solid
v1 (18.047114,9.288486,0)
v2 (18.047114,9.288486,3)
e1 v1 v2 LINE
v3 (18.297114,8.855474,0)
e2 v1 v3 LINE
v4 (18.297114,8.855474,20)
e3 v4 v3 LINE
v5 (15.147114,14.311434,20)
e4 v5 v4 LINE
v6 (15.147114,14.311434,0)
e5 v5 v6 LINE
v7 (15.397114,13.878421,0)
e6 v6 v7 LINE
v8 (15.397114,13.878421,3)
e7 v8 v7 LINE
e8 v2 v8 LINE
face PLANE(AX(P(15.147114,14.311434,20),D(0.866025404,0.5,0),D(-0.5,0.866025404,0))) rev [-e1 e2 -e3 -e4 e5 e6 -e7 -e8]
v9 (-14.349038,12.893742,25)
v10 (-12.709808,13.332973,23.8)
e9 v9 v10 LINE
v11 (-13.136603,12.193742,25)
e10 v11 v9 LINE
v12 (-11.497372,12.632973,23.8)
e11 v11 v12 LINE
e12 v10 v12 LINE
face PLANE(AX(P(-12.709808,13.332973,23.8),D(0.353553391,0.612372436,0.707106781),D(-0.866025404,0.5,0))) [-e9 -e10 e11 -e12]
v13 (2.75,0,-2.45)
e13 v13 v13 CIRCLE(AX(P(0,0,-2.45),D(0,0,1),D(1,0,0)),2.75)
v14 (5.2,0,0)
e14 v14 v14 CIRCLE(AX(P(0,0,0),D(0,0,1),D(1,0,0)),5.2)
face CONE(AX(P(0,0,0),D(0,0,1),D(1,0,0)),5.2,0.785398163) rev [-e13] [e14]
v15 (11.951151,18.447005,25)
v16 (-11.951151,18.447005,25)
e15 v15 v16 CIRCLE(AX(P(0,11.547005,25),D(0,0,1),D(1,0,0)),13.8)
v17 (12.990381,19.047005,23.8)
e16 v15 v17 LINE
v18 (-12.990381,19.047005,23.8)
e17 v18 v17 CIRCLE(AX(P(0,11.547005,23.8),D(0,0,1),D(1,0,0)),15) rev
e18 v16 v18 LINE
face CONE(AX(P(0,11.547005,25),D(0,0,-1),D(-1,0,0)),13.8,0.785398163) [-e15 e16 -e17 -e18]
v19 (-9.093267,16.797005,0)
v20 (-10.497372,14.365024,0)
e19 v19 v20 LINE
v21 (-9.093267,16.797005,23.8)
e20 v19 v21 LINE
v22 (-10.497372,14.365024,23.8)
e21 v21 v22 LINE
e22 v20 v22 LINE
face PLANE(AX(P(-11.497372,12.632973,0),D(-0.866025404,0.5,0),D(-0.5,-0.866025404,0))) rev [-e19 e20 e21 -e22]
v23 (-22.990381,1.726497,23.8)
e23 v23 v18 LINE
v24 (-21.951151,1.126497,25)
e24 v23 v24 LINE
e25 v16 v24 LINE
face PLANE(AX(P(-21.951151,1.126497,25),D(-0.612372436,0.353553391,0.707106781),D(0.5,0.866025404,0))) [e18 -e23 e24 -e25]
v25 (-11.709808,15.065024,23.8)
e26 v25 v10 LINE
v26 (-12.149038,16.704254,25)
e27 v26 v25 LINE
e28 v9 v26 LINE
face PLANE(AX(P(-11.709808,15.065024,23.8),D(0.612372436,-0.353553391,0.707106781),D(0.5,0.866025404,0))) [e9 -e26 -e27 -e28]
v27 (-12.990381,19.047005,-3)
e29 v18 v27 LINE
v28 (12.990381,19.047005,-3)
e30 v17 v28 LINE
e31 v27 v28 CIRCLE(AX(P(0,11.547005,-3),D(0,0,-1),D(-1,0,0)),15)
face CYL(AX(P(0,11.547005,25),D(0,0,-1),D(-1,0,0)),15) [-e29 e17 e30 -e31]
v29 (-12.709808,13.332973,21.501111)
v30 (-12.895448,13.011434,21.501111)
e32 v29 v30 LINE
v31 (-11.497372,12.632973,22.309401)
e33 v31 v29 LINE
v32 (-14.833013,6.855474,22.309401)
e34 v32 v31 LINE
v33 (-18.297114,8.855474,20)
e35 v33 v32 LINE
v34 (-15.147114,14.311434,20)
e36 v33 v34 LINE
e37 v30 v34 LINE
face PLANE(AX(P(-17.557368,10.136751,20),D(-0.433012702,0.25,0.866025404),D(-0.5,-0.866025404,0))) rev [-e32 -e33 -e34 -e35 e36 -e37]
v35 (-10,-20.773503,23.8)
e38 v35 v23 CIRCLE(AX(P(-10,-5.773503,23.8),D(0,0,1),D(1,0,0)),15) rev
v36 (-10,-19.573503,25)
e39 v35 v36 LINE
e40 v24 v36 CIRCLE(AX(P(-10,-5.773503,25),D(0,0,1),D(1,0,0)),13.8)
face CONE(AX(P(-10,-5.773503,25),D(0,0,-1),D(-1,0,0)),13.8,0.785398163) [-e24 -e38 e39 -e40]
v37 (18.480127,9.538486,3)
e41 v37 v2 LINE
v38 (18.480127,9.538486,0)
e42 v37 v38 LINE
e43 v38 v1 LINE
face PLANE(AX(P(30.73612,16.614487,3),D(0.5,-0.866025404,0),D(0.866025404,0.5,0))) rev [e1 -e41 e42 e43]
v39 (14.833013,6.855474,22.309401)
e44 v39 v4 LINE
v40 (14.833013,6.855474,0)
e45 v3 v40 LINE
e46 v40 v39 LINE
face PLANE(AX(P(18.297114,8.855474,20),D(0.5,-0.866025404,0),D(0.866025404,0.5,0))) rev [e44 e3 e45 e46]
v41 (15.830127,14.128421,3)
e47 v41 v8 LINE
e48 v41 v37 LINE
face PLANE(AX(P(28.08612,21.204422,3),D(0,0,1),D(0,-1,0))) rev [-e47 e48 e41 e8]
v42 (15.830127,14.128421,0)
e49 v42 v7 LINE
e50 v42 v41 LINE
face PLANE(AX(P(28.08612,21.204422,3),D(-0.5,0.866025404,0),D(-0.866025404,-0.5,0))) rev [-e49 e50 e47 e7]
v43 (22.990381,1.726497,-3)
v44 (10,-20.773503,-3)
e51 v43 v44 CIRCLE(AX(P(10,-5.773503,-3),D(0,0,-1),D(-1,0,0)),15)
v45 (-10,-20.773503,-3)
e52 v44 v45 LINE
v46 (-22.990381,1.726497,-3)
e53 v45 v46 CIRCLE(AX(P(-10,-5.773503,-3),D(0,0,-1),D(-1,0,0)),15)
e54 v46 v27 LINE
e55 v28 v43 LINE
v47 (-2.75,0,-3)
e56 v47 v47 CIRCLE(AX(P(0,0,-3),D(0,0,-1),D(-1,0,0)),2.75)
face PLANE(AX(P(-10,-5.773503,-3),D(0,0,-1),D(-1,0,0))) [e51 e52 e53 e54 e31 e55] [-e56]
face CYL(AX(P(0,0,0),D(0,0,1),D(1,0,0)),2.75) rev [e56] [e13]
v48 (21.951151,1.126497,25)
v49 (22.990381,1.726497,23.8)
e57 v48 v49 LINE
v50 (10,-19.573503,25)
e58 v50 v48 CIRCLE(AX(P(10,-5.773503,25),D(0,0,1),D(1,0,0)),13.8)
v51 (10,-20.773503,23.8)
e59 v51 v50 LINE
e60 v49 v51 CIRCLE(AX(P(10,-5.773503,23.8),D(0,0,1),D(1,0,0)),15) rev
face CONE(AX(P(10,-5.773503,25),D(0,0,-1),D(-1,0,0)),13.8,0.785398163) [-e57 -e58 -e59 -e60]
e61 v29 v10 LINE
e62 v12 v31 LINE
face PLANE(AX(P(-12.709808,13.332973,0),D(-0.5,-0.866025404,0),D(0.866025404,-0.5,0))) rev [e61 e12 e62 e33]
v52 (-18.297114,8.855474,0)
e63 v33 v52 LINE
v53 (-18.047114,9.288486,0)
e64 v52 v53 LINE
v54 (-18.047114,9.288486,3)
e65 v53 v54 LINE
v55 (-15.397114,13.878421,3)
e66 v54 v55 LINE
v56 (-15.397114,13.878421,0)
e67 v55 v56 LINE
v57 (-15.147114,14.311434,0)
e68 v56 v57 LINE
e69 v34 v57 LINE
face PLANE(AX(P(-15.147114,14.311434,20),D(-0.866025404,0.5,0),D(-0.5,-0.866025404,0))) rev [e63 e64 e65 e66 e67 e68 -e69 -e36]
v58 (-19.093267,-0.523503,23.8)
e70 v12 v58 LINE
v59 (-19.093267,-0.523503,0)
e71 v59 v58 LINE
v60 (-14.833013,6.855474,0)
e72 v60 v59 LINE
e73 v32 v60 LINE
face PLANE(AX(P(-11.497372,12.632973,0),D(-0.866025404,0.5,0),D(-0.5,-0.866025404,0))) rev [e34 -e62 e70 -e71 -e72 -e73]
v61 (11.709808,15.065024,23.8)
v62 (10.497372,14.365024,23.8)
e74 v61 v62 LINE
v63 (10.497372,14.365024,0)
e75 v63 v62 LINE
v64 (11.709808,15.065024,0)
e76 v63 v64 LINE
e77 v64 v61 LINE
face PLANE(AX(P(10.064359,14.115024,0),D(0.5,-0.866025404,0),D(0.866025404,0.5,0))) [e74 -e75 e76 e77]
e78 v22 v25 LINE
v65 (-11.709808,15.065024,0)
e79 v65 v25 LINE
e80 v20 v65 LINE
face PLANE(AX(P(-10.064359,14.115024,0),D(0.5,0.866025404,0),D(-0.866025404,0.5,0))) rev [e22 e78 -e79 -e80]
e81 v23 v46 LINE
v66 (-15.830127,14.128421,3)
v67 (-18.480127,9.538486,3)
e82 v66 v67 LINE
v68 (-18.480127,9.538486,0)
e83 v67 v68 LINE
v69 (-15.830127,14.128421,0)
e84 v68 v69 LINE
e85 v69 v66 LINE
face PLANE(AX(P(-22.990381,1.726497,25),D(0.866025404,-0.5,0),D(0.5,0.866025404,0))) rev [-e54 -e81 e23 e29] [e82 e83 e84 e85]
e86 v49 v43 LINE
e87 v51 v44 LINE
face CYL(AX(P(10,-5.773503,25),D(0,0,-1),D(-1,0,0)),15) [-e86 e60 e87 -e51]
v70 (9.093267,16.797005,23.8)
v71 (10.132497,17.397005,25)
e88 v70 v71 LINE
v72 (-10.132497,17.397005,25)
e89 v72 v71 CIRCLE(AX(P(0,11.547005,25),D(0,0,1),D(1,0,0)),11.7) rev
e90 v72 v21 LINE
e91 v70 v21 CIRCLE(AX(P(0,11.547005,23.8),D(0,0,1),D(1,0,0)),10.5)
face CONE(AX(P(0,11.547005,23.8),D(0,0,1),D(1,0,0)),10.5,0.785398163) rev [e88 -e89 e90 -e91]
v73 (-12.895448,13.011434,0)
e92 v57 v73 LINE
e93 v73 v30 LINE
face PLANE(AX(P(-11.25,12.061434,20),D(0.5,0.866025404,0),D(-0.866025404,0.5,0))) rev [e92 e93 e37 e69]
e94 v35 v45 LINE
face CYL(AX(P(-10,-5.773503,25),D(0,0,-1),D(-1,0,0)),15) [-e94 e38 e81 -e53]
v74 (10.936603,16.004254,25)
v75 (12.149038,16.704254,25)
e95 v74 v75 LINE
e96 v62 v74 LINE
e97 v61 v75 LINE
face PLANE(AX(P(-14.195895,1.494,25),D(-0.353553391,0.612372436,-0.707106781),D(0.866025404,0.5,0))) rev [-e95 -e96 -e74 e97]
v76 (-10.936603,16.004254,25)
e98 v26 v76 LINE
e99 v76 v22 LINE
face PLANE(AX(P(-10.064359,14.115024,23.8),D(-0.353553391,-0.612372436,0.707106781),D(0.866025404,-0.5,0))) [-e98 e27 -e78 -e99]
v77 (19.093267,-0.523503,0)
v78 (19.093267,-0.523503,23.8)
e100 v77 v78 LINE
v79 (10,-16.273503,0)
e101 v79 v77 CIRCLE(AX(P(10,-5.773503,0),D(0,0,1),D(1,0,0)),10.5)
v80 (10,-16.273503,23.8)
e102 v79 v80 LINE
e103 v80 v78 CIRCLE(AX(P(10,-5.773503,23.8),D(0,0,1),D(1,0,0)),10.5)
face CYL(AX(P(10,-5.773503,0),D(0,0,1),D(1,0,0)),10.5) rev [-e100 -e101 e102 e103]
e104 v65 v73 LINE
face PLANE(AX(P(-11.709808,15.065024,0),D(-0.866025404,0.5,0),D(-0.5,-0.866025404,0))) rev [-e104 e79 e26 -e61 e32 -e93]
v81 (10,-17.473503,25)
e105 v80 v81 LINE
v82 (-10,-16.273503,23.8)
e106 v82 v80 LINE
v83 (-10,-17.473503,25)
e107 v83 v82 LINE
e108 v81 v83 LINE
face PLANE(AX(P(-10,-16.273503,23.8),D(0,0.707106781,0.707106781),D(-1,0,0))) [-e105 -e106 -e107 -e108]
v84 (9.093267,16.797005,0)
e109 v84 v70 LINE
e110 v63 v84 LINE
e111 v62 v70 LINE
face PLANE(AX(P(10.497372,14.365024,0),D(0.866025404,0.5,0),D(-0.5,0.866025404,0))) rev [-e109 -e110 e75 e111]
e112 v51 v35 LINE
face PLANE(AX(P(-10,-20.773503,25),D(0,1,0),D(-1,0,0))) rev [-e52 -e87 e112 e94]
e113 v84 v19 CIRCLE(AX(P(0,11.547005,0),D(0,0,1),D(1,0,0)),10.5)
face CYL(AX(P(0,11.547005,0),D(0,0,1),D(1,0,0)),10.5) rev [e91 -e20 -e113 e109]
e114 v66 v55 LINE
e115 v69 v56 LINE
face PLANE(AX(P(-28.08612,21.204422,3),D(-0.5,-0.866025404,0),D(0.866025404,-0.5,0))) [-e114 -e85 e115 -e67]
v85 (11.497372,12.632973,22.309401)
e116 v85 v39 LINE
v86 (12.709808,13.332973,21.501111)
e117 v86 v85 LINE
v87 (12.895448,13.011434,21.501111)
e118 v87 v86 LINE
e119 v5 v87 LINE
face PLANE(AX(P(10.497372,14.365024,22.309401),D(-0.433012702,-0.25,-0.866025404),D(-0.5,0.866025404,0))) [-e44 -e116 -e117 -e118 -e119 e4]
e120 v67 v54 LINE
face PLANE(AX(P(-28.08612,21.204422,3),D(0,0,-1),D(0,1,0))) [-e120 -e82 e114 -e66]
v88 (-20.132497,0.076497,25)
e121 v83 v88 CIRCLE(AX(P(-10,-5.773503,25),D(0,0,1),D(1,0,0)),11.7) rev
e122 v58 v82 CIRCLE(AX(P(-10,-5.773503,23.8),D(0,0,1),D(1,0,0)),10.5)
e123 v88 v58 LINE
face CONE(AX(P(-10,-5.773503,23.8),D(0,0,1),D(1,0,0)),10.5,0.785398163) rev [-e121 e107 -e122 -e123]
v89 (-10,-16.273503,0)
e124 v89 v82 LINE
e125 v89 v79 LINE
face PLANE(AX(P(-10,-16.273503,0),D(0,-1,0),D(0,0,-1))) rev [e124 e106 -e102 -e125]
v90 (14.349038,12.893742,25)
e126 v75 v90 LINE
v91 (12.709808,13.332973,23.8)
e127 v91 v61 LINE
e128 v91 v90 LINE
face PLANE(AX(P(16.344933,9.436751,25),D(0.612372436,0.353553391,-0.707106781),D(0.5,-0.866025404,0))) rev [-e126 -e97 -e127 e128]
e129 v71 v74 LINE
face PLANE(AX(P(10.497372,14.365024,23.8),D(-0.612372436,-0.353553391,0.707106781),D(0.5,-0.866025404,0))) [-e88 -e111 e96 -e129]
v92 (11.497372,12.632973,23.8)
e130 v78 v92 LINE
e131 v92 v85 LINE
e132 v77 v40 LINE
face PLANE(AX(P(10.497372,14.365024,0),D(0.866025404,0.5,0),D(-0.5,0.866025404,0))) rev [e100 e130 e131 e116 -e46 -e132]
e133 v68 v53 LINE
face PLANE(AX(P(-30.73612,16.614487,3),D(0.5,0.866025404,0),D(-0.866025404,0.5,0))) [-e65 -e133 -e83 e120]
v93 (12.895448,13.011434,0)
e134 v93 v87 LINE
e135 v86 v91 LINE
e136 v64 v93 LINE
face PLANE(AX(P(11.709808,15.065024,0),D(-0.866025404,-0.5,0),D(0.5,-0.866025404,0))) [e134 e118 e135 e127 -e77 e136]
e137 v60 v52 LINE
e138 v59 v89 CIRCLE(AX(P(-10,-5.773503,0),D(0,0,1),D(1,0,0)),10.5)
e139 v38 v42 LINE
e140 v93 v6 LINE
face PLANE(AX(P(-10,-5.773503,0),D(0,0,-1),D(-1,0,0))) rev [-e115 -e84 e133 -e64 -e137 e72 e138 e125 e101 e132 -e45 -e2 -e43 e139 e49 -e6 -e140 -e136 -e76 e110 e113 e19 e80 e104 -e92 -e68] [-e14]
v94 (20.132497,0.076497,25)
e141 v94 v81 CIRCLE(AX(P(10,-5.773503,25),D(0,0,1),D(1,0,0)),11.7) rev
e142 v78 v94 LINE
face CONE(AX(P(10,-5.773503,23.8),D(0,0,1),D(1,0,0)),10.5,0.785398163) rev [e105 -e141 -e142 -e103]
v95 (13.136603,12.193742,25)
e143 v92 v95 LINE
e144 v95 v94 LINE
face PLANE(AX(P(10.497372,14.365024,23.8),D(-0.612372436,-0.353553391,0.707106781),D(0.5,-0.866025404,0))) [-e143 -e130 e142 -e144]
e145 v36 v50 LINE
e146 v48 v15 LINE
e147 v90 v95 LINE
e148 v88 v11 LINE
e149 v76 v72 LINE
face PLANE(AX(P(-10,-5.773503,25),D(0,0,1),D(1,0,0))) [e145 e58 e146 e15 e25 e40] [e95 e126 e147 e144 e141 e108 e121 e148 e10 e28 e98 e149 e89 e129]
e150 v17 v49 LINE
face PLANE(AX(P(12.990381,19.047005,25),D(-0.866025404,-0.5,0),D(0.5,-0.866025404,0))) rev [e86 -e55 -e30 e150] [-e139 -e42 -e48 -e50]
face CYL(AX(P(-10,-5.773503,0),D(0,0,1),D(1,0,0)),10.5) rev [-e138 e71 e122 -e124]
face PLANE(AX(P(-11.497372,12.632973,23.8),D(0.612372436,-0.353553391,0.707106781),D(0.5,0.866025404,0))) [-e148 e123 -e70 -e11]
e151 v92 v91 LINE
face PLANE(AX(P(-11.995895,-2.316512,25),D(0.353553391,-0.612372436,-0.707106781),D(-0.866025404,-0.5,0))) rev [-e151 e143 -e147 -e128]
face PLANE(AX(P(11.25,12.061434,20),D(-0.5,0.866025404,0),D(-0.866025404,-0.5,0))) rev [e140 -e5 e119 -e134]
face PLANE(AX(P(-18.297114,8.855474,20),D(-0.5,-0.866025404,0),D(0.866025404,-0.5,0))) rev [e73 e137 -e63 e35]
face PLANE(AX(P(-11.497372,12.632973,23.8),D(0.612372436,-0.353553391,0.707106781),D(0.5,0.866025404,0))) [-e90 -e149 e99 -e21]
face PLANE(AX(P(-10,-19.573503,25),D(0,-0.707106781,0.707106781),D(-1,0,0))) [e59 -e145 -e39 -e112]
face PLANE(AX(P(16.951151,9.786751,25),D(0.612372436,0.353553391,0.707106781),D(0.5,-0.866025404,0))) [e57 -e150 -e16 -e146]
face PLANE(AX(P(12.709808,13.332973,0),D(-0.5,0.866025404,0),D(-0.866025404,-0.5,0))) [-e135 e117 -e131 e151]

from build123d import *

# Parameters (mm, degrees)
BOSS_EXTRU_1_DEPTH      = 25
ENL_V_MAT_EXTRU_1_DEPTH = 20
ENL_V_MAT_EXTRU_2_DEPTH = 45.21248121115924
ENL_V_MAT_EXTRU_4_DEPTH = 20
ENL_V_MAT_EXTRU_3_DEPTH = 45.21248121115924
CHANFREIN1_SIZE         = 1.2
BOSS_EXTRU_2_START      = 3
BOSS_EXTRU_2_DEPTH      = 3
ENL_V_MAT_EXTRU_5_REACH = 47.001
ESQUISSE7_W             = 1.399999999999995
ESQUISSE7_H             = 20
CHANFREIN2_SIZE2        = 4
CHANFREIN2_SIZE         = 2.309401077
ENL_V_MAT_EXTRU_6_REACH = 60.237
CHANFREIN3_SIZE2        = 4
CHANFREIN3_SIZE         = 2.309401077


with BuildPart() as part:
    # Esquisse1 → Boss.-Extru.1 (new body)
    with BuildSketch(Plane.XY):
        with BuildLine():
            Line((-22.99038105676658, 1.7264973081037391), (-12.990381056766578, 19.047005383792516))
            ThreePointArc((-12.990381056766578, 19.047005383792516), (9.5e-16, 26.547005383792516), (12.990381056766578, 19.047005383792513))
            Line((12.990381056766578, 19.047005383792513), (22.990381056766577, 1.726497308103746))
            ThreePointArc((22.990381056766577, 1.726497308103746), (22.99038105676658, -13.273502691896258), (9.999999999999996, -20.77350269189626))
            Line((9.999999999999996, -20.77350269189626), (-10, -20.773502691896258))
            ThreePointArc((-10, -20.773502691896258), (-22.99038105676658, -13.273502691896255), (-22.99038105676658, 1.7264973081037391))
        make_face()
        with BuildLine():
            Line((-18.66025403784439, -0.7735026918962613), (-8.66025403784439, 16.547005383792516))
            ThreePointArc((-8.66025403784439, 16.547005383792516), (-2.69e-15, 21.547005383792516), (8.660254037844384, 16.547005383792516))
            Line((8.660254037844384, 16.547005383792516), (18.660254037844386, -0.7735026918962474))
            ThreePointArc((18.660254037844386, -0.7735026918962474), (18.660254037844393, -10.773502691896258), (10, -15.773502691896258))
            Line((10, -15.773502691896258), (-10, -15.773502691896258))
            ThreePointArc((-10, -15.773502691896258), (-18.66025403784439, -10.773502691896262), (-18.66025403784439, -0.7735026918962613))
        make_face(mode=Mode.SUBTRACT)
    extrude(amount=BOSS_EXTRU_1_DEPTH)

    # Esquisse2 → Enlèv. mat.-Extru.1 (cut)
    with BuildSketch(Plane.XY.offset(25)):
        Polygon((-10.914359353944898, 12.642780450695335), (-12.300000000000002, 13.442780450695334), (-11.600000000000003, 14.655216015993549), (-10.2143593539449, 13.855216015993548), align=None)
        Polygon((10.214359353944896, 13.855216015993548), (11.6, 14.655216015993549), (12.299999999999999, 13.442780450695334), (10.914359353944896, 12.642780450695334), align=None)
    extrude(amount=-ENL_V_MAT_EXTRU_1_DEPTH, mode=Mode.SUBTRACT)

    # Esquisse3 → Enlèv. mat.-Extru.2 (cut, through all)
    with BuildSketch(Plane.XY.offset(25)):
        Polygon((-10.064359353944898, 14.115023637128878), (-11.709807621135333, 15.06502363712888), (-12.709807621135335, 13.332972829560003), (-11.064359353944898, 12.382972829560003), align=None)
    enl_v_mat_extru_2 = extrude(amount=-ENL_V_MAT_EXTRU_2_DEPTH, mode=Mode.SUBTRACT)

    # Symétrie1: Enlèv. mat.-Extru.2 across plane
    add(enl_v_mat_extru_2.mirror(Plane(origin=(0, 0, 0), x_dir=(0, 0, 1), z_dir=(1, 0, 0))), mode=Mode.SUBTRACT)

    # Esquisse6 → Enlèv. mat.-Extru.4 (cut)
    with BuildSketch(Plane(origin=(0, 0, 0), x_dir=(-1, 0, 0), z_dir=(0, 0, -1))):
        Polygon((11.250000000000002, 12.061433798642659), (15.147114317029969, 14.31143379864266), (18.297114317029976, 8.855473754800698), (14.4, 6.605473754800695), align=None)
        Polygon((-11.249999999999998, 12.061433798642659), (-15.14711431702997, 14.311433798642657), (-18.297114317029973, 8.855473754800693), (-14.399999999999997, 6.605473754800696), align=None)
    extrude(amount=-ENL_V_MAT_EXTRU_4_DEPTH, mode=Mode.SUBTRACT)

    # Esquisse5 → Enlèv. mat.-Extru.3 (cut, through all)
    with BuildSketch(Plane.XY.offset(25)):
        with BuildLine():
            Line((-9.093266739736611, 16.797005383792516), (-10.497372055837118, 14.365023637128878))
            Line((-10.497372055837118, 14.365023637128878), (-11.497372055837118, 12.632972829560003))
            Line((-11.497372055837118, 12.632972829560003), (-19.093266739736613, -0.5235026918962613))
            ThreePointArc((-19.093266739736613, -0.5235026918962613), (-19.09326673973661, -11.023502691896262), (-10.000000000000002, -16.273502691896258))
            Line((-10.000000000000002, -16.273502691896258), (10.000000000000004, -16.273502691896258))
            ThreePointArc((10.000000000000004, -16.273502691896258), (19.09326673973661, -11.023502691896251), (19.093266739736602, -0.523502691896249))
            Line((19.093266739736602, -0.523502691896249), (11.497372055837113, 12.632972829560005))
            Line((11.497372055837113, 12.632972829560005), (10.497372055837118, 14.36502363712888))
            Line((10.497372055837118, 14.36502363712888), (9.0932667397366, 16.797005383792516))
            ThreePointArc((9.0932667397366, 16.797005383792516), (-2.66e-15, 22.047005383792516), (-9.093266739736611, 16.797005383792516))
        make_face()
        with BuildLine():
            Line((-8.66025403784439, 16.547005383792516), (-10.064359353944898, 14.115023637128878))
            Line((-10.064359353944898, 14.115023637128878), (-11.064359353944894, 12.382972829560005))
            Line((-11.064359353944894, 12.382972829560005), (-18.66025403784439, -0.7735026918962613))
            ThreePointArc((-18.66025403784439, -0.7735026918962613), (-18.66025403784439, -10.773502691896262), (-10, -15.773502691896258))
            Line((-10, -15.773502691896258), (10.000000000000002, -15.77350269189626))
            ThreePointArc((10.000000000000002, -15.77350269189626), (18.66025403784439, -10.773502691896255), (18.660254037844386, -0.7735026918962474))
            Line((18.660254037844386, -0.7735026918962474), (11.064359353944898, 12.382972829560003))
            Line((11.064359353944898, 12.382972829560003), (10.064359353944898, 14.115023637128878))
            Line((10.064359353944898, 14.115023637128878), (8.660254037844384, 16.547005383792516))
            ThreePointArc((8.660254037844384, 16.547005383792516), (-2.69e-15, 21.547005383792516), (-8.66025403784439, 16.547005383792516))
        make_face(mode=Mode.SUBTRACT)
    extrude(amount=-ENL_V_MAT_EXTRU_3_DEPTH, mode=Mode.SUBTRACT)

    # Chanfrein1
    chanfrein1_edges = [part.edges().sort_by_distance(p)[0] for p in [
        (22.99038105676658, -13.27350269189626, 25),
        (11.103589838486222, 14.715023637128876, 25),
        (-11.103589838486226, 14.71502363712888, 25),
        (-9.795319397786868, 15.581014510460694, 25),
        (9.795319397786855, 15.581014510460696, 25),
        (-7.11e-15, 22.047005383792516, 25),
        (-15.295319397786866, 6.054735068831872, 25),
        (-19.09326673973661, -11.023502691896262, 25),
        (1.78e-15, -16.273502691896258, 25),
        (19.093266739736606, -11.023502691896253, 25),
        (15.295319397786855, 6.054735068831873, 25),
        (17.990381056766577, 10.386751345948129, 25),
        (2.66e-15, 26.547005383792516, 25),
        (-17.99038105676658, 10.386751345948127, 25),
        (-22.99038105676658, -13.273502691896258, 25),
        (-12.209807621135333, 14.19899823334444, 25),
        (-12.103589838486226, 12.982972829560003, 25),
        (-1.78e-15, -20.77350269189626, 25),
        (12.209807621135335, 14.19899823334444, 25),
        (12.103589838486222, 12.982972829560001, 25),
    ]]
    chamfer(chanfrein1_edges, length=CHANFREIN1_SIZE)

    # Esquisse4 → Boss.-Extru.2 (add)
    with BuildSketch(Plane(origin=(0, 0, 0), x_dir=(-1, 0, 0), z_dir=(0, 0, -1)).offset(BOSS_EXTRU_2_START)):
        with BuildLine():
            Line((22.99038105676658, 1.7264973081037323), (12.990381056766578, 19.047005383792516))
            ThreePointArc((12.990381056766578, 19.047005383792516), (8.9e-16, 26.547005383792513), (-12.990381056766573, 19.047005383792513))
            Line((-12.990381056766573, 19.047005383792513), (-22.990381056766577, 1.726497308103746))
            ThreePointArc((-22.990381056766577, 1.726497308103746), (-22.99038105676658, -13.273502691896255), (-10.000000000000004, -20.773502691896258))
            Line((-10.000000000000004, -20.773502691896258), (9.999999999999996, -20.773502691896258))
            ThreePointArc((9.999999999999996, -20.773502691896258), (22.990381056766577, -13.273502691896262), (22.99038105676658, 1.7264973081037323))
        make_face()
    extrude(amount=-BOSS_EXTRU_2_DEPTH)

    # Esquisse7 → Enlèv. mat.-Extru.5 (cut, up to next)
    with BuildSketch(Plane(origin=(-2.5958946838994956, 4.496221483611885, 0), x_dir=(0.866025403784439, 0.4999999999999994, 0), z_dir=(-0.4999999999999994, 0.866025403784439, 0)), mode=Mode.PRIVATE) as enl_v_mat_extru_5_sk1:
        with Locations((16.973502691896265, -10)):
            Rectangle(ESQUISSE7_W, ESQUISSE7_H)
    enl_v_mat_extru_5_tool1 = extrude(enl_v_mat_extru_5_sk1.sketch, amount=-ENL_V_MAT_EXTRU_5_REACH, mode=Mode.PRIVATE) & part.part
    enl_v_mat_extru_5 = enl_v_mat_extru_5_tool1.solids().sort_by_distance((12.10359, 12.982973, 10))[0]
    add(enl_v_mat_extru_5, mode=Mode.SUBTRACT)

    # Symétrie2: Enlèv. mat.-Extru.5 across plane
    add(enl_v_mat_extru_5.mirror(Plane(origin=(0, 0, 0), x_dir=(0, 0, 1), z_dir=(1, 0, 0))), mode=Mode.SUBTRACT)

    # Chanfrein2
    chanfrein2_edges = [part.edges().sort_by_distance(p)[0] for p in [
        (13.16519237886467, 9.74422329218035, 20),
    ]]
    chanfrein2_side = [part.faces().sort_by_distance(p)[0] for p in [
        (13.16519237886467, 9.74422329218035, 20.04618802153517),
    ]]
    chamfer(chanfrein2_edges, length=CHANFREIN2_SIZE - 0.0001, length2=CHANFREIN2_SIZE2 - 0.0001, reference=chanfrein2_side[0])  # a hair under: the kernel refuses the full size

    # Esquisse8 → Enlèv. mat.-Extru.6 (cut, up to next)
    with BuildSketch(Plane(origin=(17.557368354874363, 10.13675134594814, 0), x_dir=(0, 0, 1), z_dir=(-0.8660254037844385, -0.5000000000000004, 0)), mode=Mode.PRIVATE) as enl_v_mat_extru_6_sk1:
        Polygon((3.0000000000000004, 4.320508075688777), (5.3e-16, 4.320508075688777), (8.7e-16, -0.9794919243112247), (3.000000000000001, -0.9794919243112244), align=None)
    enl_v_mat_extru_6_tool1 = extrude(enl_v_mat_extru_6_sk1.sketch, amount=-ENL_V_MAT_EXTRU_6_REACH, mode=Mode.PRIVATE) & part.part
    enl_v_mat_extru_6 = enl_v_mat_extru_6_tool1.solids().sort_by_distance((16.722114, 11.583454, 1.5))[0]
    add(enl_v_mat_extru_6, mode=Mode.SUBTRACT)

    # Symétrie3: Enlèv. mat.-Extru.6 across plane
    add(enl_v_mat_extru_6.mirror(Plane(origin=(0, 0, 0), x_dir=(0, 0, 1), z_dir=(1, 0, 0))), mode=Mode.SUBTRACT)

    # Chanfrein3
    chanfrein3_edges = [part.edges().sort_by_distance(p)[0] for p in [
        (-13.16519237886467, 9.74422329218035, 20),
    ]]
    chanfrein3_side = [part.faces().sort_by_distance(p)[0] for p in [
        (-13.16519237886467, 9.74422329218035, 20.04618802153517),
    ]]
    chamfer(chanfrein3_edges, length=CHANFREIN3_SIZE - 0.0001, length2=CHANFREIN3_SIZE2 - 0.0001, reference=chanfrein3_side[0])  # a hair under: the kernel refuses the full size

    # Esquisse10 → Fraisage pour vis à tête fraisée M51 (revolve, cut)
    with BuildSketch(Plane(origin=(0, 0, 0), x_dir=(0, -1, 0), z_dir=(1, 0, 0))):
        Polygon((0, 0), (-7.3e-16, 2.9999999999999996), (2.7499999999999996, 2.9999999999999996), (2.75, 2.449999999999999), (5.200000000000001, 0), align=None)
    revolve(axis=Axis((0, 0, 6.349999999999991), (0, 0, -1)), mode=Mode.SUBTRACT)


solid = part.part
